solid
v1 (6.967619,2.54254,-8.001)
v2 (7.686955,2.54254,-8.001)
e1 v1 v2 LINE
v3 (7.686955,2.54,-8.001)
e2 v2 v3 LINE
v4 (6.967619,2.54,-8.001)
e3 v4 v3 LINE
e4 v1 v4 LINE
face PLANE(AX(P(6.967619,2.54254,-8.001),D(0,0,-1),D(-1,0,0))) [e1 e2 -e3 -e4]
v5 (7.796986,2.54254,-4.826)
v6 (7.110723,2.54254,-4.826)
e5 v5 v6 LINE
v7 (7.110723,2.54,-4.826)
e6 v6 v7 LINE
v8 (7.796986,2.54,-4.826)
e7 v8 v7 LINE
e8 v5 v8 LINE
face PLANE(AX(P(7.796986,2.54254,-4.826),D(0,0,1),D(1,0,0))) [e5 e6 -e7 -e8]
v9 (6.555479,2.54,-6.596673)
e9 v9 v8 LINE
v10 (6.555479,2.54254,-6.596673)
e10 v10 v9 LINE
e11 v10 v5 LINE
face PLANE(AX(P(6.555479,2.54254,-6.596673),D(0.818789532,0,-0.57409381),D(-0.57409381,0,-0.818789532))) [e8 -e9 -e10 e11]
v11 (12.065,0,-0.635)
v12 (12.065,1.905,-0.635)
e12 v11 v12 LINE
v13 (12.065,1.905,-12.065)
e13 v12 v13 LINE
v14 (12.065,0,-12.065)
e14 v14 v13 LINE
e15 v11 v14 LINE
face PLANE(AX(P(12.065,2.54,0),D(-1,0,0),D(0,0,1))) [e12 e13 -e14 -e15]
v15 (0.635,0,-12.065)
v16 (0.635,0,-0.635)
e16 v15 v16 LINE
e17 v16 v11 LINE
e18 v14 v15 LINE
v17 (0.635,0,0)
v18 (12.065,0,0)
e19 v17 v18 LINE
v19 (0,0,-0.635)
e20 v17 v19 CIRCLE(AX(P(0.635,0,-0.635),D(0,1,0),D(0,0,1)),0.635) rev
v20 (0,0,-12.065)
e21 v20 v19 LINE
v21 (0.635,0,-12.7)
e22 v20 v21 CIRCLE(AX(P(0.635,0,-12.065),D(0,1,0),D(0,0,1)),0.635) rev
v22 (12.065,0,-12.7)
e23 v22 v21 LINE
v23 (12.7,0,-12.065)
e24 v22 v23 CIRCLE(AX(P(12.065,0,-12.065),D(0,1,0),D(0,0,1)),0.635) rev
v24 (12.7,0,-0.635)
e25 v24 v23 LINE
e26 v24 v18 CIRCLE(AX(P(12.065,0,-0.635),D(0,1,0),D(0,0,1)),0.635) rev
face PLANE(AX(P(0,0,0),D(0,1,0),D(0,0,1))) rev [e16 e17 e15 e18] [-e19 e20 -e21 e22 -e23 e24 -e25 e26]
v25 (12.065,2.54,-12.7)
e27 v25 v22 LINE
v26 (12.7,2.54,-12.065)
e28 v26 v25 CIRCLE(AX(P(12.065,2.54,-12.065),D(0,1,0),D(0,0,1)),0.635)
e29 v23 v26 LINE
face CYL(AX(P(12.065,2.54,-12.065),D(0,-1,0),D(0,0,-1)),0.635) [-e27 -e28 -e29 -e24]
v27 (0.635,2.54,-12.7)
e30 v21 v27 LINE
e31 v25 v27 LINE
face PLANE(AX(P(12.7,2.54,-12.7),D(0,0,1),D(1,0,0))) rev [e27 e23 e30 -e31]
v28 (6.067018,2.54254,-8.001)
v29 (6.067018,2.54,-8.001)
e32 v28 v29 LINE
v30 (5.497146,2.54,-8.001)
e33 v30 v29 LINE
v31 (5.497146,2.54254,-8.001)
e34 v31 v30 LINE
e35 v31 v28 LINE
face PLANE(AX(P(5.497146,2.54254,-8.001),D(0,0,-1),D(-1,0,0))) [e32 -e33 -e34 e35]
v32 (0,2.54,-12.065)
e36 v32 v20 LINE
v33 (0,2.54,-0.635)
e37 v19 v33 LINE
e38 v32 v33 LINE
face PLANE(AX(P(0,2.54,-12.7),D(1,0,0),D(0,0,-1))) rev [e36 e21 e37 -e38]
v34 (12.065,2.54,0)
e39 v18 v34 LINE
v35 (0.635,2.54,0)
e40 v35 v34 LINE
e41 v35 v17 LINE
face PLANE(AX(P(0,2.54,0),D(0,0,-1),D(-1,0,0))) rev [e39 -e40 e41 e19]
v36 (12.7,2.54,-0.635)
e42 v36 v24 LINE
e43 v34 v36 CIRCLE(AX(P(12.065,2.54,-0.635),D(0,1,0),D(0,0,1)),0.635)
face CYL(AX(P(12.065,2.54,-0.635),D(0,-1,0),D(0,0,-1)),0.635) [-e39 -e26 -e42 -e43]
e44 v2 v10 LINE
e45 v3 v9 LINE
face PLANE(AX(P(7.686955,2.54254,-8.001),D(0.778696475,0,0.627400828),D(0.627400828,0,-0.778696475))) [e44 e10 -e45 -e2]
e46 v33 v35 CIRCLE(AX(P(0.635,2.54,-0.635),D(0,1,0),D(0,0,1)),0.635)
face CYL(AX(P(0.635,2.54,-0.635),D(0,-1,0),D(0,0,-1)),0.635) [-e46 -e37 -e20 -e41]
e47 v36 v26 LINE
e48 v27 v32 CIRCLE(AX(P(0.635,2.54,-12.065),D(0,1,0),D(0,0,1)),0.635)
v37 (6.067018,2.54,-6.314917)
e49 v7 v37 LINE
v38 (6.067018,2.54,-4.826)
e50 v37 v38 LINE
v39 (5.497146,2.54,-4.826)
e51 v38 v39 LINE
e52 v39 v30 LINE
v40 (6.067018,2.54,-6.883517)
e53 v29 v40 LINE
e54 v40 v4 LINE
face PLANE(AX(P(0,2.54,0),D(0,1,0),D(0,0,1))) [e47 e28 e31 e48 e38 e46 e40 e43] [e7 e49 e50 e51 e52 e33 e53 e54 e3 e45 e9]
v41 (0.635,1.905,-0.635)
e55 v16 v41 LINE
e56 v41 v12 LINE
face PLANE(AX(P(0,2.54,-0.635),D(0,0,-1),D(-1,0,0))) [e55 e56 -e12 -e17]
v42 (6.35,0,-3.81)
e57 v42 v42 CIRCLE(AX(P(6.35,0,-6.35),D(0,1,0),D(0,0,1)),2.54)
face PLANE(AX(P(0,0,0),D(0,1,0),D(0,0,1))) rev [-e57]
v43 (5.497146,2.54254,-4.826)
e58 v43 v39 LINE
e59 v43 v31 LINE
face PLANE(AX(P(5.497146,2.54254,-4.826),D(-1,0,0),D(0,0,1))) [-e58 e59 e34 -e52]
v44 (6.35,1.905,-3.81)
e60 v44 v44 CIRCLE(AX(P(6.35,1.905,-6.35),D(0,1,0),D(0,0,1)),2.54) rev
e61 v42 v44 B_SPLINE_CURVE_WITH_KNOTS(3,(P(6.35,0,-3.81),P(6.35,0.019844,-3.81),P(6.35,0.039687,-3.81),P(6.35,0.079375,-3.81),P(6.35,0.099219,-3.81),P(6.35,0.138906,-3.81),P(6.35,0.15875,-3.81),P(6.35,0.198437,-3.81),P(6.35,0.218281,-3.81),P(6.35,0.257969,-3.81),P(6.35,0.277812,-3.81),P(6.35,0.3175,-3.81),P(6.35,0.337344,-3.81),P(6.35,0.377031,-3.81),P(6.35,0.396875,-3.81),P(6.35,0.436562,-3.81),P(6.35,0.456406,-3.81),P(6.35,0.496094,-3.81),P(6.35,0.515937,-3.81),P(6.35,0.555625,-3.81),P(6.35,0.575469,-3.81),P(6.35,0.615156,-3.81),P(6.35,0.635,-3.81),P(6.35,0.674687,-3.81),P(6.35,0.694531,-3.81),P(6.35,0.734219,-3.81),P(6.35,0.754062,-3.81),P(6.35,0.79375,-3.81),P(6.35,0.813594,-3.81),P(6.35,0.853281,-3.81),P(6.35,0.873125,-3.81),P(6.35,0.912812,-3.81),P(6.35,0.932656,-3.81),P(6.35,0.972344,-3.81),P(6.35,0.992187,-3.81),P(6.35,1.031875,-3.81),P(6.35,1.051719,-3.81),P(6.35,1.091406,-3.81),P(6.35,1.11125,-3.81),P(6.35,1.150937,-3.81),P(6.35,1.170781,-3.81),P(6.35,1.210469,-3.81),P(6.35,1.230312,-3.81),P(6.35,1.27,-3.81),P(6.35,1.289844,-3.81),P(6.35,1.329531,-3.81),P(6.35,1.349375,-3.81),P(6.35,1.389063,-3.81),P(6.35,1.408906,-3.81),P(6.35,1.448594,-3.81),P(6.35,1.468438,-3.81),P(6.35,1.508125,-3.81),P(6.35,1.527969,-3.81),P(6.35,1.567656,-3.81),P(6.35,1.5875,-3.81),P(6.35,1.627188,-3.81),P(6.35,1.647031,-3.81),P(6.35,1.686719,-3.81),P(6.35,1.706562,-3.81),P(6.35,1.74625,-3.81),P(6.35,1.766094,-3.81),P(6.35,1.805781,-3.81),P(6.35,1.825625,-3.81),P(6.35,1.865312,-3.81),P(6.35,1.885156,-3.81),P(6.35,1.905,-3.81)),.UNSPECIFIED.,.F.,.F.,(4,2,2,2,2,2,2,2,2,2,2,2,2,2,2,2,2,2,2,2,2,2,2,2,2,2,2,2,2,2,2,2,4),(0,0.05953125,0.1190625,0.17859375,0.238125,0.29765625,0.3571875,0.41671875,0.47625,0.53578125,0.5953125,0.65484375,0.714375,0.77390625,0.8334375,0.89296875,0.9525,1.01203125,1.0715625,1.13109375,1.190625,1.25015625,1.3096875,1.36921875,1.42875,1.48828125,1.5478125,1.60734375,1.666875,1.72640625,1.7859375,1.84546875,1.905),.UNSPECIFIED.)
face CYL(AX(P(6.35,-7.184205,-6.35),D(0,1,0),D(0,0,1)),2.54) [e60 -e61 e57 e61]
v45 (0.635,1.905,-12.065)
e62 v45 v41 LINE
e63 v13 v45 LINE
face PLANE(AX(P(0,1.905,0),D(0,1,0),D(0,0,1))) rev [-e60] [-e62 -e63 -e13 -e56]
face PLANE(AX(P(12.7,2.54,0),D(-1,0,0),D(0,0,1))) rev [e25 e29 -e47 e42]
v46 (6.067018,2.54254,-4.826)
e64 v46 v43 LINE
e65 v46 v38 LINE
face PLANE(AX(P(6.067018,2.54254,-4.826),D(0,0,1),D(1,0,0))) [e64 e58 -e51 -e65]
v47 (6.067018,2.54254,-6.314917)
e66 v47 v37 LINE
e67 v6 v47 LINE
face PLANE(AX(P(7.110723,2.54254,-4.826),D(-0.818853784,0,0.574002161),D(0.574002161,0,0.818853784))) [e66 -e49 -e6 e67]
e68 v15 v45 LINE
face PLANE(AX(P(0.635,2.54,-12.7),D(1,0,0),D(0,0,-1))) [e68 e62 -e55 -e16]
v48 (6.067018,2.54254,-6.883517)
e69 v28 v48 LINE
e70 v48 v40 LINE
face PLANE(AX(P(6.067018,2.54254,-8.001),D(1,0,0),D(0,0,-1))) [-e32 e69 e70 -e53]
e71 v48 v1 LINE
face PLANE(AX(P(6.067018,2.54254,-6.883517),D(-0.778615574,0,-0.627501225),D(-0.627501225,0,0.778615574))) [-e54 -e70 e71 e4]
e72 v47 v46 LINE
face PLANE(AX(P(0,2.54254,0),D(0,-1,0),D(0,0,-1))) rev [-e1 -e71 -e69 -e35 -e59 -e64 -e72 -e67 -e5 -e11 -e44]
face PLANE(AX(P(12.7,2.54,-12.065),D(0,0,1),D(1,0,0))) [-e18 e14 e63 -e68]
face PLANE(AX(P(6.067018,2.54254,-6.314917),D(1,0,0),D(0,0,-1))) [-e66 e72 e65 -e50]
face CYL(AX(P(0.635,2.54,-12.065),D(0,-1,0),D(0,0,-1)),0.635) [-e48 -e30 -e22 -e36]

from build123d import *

# Parameters (mm, degrees)
SKETCH1_W           = 12.7
SKETCH1_H           = 12.7
BOSS_EXTRUDE1_DEPTH = 2.54
FILLET1_R           = 0.635
SHELL1_START        = 0.635
SHELL1_OUTLINE_W    = 1.905
SHELL1_OUTLINE_H    = 11.43
SHELL1_DEPTH        = 11.43
SKETCH2_R           = 2.54
BOSS_EXTRUDE2_DEPTH = 1.905
BOSS_EXTRUDE3_DEPTH = 0.00254


# Read off the part's stored shape, not the designer's step: Shell1
with BuildPart() as part:
    # Sketch1 → Boss-Extrude1 (new body)
    with BuildSketch(Plane(origin=(0, 0, 0), x_dir=(1, 0, 0), z_dir=(0, 1, 0))):
        with Locations((6.35, 6.35)):
            Rectangle(SKETCH1_W, SKETCH1_H)
    extrude(amount=BOSS_EXTRUDE1_DEPTH)

    # Fillet1
    fillet1_edges = [part.edges().sort_by_distance(p)[0] for p in [
        (0, 1.27, -12.7),
        (12.7, 1.27, -12.7),
        (12.7, 1.27, 0),
        (0, 1.27, 0),
    ]]
    fillet(fillet1_edges, radius=FILLET1_R)

    # Shell1 outline → Shell1 (cut)
    with BuildSketch(Plane.YZ.offset(SHELL1_START)):
        with Locations((0.9525, -6.35)):
            Rectangle(SHELL1_OUTLINE_W, SHELL1_OUTLINE_H)
    extrude(amount=SHELL1_DEPTH, mode=Mode.SUBTRACT)

    # Sketch2 → Boss-Extrude2 (add)
    with BuildSketch(Plane(origin=(0, 1.905, 0), x_dir=(-1, 0, 0), z_dir=(0, -1, 0))):
        with Locations(Location((-6.35, 6.35, 0), (0, 0, 270))):
            Circle(SKETCH2_R)
    extrude(amount=BOSS_EXTRUDE2_DEPTH)

    # Sketch3 → Boss-Extrude3 (add)
    with BuildSketch(Plane(origin=(0, 2.54, 0), x_dir=(1, 0, 0), z_dir=(0, 1, 0))):
        Polygon((5.497146154, 8.001), (6.067017949, 8.001), (6.067017949, 6.883517027), (6.96761891, 8.001), (7.686954848, 8.001), (6.555479487, 6.596673077), (7.796985897, 4.826), (7.110722877, 4.826), (6.067017949, 6.314917268), (6.067017949, 4.826), (5.497146154, 4.826), align=None)
    extrude(amount=BOSS_EXTRUDE3_DEPTH)


solid = part.part
